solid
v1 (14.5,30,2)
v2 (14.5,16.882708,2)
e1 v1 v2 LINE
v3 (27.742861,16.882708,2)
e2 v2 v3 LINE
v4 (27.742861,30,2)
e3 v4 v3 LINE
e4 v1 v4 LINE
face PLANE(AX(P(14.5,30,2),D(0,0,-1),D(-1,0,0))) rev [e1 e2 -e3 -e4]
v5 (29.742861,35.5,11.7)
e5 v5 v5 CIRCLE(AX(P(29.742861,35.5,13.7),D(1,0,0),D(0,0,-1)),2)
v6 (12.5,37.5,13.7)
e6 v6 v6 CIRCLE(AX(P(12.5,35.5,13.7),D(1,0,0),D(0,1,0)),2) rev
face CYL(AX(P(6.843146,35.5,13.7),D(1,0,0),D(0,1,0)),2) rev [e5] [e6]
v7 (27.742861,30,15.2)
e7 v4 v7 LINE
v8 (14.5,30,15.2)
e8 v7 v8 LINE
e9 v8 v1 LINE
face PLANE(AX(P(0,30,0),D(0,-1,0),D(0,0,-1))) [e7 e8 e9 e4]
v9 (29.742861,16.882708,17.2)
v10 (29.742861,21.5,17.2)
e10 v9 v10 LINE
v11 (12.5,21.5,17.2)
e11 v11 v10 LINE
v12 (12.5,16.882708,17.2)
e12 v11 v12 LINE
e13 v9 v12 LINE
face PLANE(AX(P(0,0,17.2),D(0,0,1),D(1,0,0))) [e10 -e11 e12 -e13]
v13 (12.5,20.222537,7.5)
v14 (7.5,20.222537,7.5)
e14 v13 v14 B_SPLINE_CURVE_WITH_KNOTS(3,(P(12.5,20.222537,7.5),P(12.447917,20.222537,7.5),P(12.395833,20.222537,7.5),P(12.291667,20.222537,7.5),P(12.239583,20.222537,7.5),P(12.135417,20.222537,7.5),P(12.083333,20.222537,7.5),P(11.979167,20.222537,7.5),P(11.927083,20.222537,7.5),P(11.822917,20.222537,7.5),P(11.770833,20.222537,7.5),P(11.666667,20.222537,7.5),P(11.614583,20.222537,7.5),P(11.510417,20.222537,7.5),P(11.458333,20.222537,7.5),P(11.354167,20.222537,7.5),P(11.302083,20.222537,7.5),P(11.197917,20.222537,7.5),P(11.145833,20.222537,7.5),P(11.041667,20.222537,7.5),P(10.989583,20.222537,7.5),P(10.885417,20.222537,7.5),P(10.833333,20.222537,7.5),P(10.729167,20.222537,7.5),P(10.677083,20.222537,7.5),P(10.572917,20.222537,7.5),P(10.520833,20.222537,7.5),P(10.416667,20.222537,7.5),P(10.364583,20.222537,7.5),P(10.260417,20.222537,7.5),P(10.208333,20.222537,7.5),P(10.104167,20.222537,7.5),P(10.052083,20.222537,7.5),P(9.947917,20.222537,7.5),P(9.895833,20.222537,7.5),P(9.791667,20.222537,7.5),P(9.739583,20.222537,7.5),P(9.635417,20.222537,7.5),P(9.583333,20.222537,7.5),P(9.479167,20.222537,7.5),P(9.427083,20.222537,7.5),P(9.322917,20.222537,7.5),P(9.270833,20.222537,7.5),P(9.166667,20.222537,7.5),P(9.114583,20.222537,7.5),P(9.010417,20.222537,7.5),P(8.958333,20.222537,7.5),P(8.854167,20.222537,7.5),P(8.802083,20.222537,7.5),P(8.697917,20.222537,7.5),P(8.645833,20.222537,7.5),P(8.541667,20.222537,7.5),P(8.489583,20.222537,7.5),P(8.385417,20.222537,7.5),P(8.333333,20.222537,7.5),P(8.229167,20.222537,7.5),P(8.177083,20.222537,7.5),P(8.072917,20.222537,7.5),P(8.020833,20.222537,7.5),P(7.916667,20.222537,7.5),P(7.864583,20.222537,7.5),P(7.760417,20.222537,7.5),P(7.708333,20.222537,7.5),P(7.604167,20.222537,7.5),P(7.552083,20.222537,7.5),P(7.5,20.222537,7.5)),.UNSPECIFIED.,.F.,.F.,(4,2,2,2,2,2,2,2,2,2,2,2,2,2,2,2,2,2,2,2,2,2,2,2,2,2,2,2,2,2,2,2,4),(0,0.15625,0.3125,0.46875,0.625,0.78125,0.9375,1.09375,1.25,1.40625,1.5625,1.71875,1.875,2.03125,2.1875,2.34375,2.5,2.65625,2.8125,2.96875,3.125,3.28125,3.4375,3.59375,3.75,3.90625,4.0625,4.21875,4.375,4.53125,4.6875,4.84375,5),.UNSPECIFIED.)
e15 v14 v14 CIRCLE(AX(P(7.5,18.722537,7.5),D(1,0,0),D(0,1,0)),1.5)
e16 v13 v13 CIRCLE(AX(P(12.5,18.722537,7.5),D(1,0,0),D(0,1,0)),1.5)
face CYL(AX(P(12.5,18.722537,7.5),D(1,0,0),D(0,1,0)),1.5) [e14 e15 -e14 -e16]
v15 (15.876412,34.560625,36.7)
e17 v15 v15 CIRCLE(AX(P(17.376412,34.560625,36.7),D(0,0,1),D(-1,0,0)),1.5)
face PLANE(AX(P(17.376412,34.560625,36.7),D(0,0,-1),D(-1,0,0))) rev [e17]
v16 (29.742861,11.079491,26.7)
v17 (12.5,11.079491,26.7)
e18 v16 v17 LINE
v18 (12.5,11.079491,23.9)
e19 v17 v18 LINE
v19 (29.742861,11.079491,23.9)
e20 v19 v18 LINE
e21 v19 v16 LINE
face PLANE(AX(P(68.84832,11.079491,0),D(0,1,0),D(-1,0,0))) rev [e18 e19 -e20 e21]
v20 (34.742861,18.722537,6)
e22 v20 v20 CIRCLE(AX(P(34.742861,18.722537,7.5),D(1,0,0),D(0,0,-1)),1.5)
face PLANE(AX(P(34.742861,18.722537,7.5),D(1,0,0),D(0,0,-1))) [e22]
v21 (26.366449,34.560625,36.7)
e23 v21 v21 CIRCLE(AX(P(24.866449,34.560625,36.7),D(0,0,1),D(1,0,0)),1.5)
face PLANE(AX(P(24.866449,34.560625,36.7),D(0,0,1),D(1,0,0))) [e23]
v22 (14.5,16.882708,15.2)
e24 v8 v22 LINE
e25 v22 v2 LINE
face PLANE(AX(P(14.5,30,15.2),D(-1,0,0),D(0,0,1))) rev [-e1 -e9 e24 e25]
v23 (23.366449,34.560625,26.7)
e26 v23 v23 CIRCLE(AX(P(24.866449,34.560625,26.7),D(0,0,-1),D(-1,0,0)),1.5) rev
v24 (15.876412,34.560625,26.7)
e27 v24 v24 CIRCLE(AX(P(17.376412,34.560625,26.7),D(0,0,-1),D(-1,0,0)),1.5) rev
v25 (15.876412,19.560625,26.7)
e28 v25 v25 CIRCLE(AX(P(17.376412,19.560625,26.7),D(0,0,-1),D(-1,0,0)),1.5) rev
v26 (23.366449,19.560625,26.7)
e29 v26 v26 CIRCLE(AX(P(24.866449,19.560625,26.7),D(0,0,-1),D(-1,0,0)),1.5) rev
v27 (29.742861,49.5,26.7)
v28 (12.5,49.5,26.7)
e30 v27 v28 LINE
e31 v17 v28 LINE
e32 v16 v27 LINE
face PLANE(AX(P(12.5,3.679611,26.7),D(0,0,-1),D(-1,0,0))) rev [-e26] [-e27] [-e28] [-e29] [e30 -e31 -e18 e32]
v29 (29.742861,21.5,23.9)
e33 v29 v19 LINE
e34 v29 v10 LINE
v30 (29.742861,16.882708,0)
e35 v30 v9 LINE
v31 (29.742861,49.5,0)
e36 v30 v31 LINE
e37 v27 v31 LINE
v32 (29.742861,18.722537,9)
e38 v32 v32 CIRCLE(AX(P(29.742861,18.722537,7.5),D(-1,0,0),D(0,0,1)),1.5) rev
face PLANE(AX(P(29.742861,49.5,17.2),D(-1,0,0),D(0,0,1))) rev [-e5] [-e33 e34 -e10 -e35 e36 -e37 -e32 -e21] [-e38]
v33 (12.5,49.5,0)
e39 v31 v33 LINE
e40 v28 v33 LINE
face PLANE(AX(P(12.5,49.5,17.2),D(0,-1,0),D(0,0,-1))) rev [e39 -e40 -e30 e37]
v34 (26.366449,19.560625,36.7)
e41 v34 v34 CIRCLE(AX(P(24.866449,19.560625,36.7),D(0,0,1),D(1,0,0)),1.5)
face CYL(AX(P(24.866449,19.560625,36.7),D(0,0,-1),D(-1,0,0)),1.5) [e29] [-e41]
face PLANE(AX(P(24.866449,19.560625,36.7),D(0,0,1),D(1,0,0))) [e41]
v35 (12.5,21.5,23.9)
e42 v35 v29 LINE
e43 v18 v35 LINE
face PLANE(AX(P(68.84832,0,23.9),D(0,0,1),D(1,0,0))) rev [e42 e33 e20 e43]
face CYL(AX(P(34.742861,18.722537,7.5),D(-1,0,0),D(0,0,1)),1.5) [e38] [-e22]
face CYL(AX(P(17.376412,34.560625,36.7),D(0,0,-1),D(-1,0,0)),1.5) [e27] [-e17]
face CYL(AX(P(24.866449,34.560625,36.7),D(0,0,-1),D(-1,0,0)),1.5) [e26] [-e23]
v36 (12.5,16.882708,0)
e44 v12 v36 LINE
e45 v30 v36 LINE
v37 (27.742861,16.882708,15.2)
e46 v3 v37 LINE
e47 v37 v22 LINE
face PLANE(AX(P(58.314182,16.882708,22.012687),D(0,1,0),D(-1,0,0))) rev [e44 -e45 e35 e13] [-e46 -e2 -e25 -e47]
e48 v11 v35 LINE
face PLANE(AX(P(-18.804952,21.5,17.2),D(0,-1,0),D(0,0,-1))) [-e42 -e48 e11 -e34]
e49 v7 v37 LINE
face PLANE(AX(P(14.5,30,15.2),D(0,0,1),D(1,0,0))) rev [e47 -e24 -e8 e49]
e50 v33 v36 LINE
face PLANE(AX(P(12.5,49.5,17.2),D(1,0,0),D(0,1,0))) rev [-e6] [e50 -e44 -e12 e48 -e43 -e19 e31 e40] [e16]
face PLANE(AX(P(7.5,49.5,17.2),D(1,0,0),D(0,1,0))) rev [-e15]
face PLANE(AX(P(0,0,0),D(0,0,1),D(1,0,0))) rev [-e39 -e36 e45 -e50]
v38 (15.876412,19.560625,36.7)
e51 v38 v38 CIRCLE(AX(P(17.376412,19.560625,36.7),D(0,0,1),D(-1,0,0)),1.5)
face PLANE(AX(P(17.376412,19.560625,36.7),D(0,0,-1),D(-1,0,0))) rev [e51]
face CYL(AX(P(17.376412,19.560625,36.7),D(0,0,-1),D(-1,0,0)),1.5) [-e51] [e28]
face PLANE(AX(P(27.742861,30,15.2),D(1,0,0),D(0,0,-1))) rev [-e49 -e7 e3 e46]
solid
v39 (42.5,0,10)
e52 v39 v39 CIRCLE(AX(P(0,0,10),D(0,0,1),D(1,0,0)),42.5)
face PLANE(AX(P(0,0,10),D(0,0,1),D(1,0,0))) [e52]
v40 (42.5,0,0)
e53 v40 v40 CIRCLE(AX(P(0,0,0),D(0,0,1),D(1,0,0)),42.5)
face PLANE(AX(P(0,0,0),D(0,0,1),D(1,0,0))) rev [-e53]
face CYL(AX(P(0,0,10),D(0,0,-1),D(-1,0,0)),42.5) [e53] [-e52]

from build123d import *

# Parameters (mm, degrees)
SKETCH4_R               = 42.5
BASE_DEPTH              = 10
SKETCH5_W               = 17.242861366
SKETCH5_H               = 43.5
BOSS_EXTRUDE1_DEPTH     = 17.2
SKETCH6_W               = 13.242861366
SKETCH6_H               = 13.2
CUT_EXTRUDE1_DEPTH      = 24
SKETCH9_R               = 1.5
BOSS_EXTRUDE2_DEPTH     = 5
WRAP1_START             = -22.242861366
WRAP1_OUTLINE_R         = 1.5
WRAP1_DEPTH             = 5
SKETCH14_W              = 14
SKETCH14_H              = 28
BOSS_EXTRUDE4_DEPTH     = 17.242861366
SKETCH16_R              = 14
CUT_EXTRUDE2_DEPTH      = 17.242861366
CUT_EXTRUDE4_REACH      = 108.036
SKETCH19_W              = 17.242861366
SKETCH19_H              = 4.5
CUT_EXTRUDE6_REACH      = 71.795
CUT_EXTRUDE6_END_RADIUS = 14
SKETCH22_W              = 17.242861366
SKETCH22_H              = 2.8
SKETCH23_R              = 2
CUT_EXTRUDE7_DEPTH      = 17.242861366
CUT_EXTRUDE8_REACH      = 80.665
SKETCH24_W              = 17.2
SKETCH24_H              = 5.3
CUT_EXTRUDE9_REACH      = 80.665
SKETCH25_W              = 27.034559723
SKETCH25_H              = 9.24407526
SKETCH26_W              = 2.8
SKETCH26_H              = 10.42050917
BOSS_EXTRUDE5_DEPTH     = 17.242861366
SKETCH27_R              = 1.5
BOSS_EXTRUDE6_DEPTH     = 10


# Read off the part's stored shape, not the designer's step: Wrap1
with BuildPart() as part:
    # Sketch4 → base (new body)
    with BuildSketch(Plane.XY):
        Circle(SKETCH4_R)
    extrude(amount=BASE_DEPTH)


with BuildPart() as body_2:
    # Sketch5 → Boss-Extrude1 (new body)
    with BuildSketch(Plane.XY):
        with Locations((21.121430683, 27.75)):
            Rectangle(SKETCH5_W, SKETCH5_H)
    extrude(amount=BOSS_EXTRUDE1_DEPTH)

    # Sketch6 → Cut-Extrude1 (cut)
    with BuildSketch(Plane(origin=(0, 6, 0), x_dir=(-1, 0, 0), z_dir=(0, -1, 0))):
        with Locations((-21.121430683, -8.6)):
            Rectangle(SKETCH6_W, SKETCH6_H)
    extrude(amount=-CUT_EXTRUDE1_DEPTH, mode=Mode.SUBTRACT)

    # Sketch9 → Boss-Extrude2 (add)
    with BuildSketch(Plane(origin=(29.742861366, 0, 0), x_dir=(0, 0, -1), z_dir=(1, 0, 0))):
        with Locations(Location((-7.5, 18.722537456, 0), (0, 0, 180))):
            Circle(SKETCH9_R)
    extrude(amount=BOSS_EXTRUDE2_DEPTH)

    # Wrap1 outline → Wrap1 (add)
    with BuildSketch(Plane(origin=(29.742861366, 0, 0), x_dir=(0, 0, -1), z_dir=(1, 0, 0)).offset(WRAP1_START)):
        with Locations((-7.5, 18.722537456)):
            Circle(WRAP1_OUTLINE_R)
    extrude(amount=WRAP1_DEPTH)

    # Sketch14 → Boss-Extrude4 (add)
    with BuildSketch(Plane(origin=(29.742861366, 0, 0), x_dir=(0, 0, -1), z_dir=(1, 0, 0))):
        with Locations((-24.2, 35.5)):
            Rectangle(SKETCH14_W, SKETCH14_H)
    extrude(amount=-BOSS_EXTRUDE4_DEPTH)

    # Sketch16 → Cut-Extrude2 (cut)
    with BuildSketch(Plane(origin=(29.742861366, 0, 0), x_dir=(0, 0, -1), z_dir=(1, 0, 0))):
        with Locations((-31.2, 35.5)):
            Circle(SKETCH16_R)
    extrude(amount=-CUT_EXTRUDE2_DEPTH, mode=Mode.SUBTRACT)

    # Cut-Extrude4: up to this face of the body (flat: up to its plane)
    cut_extrude4_end = Plane(body_2.part.faces().sort_by_distance((21.121430683, 21.5, 24.2))[0])
    # Sketch19 → Cut-Extrude4 (cut, up to the picked face)
    with BuildSketch(Plane(origin=(0, 49.5, 0), x_dir=(1, 0, 0), z_dir=(0, 1, 0)), mode=Mode.PRIVATE) as cut_extrude4_sk1:
        with Locations((21.121430683, -28.95)):
            Rectangle(SKETCH19_W, SKETCH19_H)
    cut_extrude4_tool1 = split(extrude(cut_extrude4_sk1.sketch, amount=-CUT_EXTRUDE4_REACH, mode=Mode.PRIVATE), bisect_by=cut_extrude4_end, keep=Keep.BOTH, mode=Mode.PRIVATE)
    add(cut_extrude4_tool1.solids().sort_by(Axis((21.121431, 49.5, 28.95), (0, -1, 0)))[0], mode=Mode.SUBTRACT)

    # Cut-Extrude6: up to this cylinder (the profile starts outside it)
    cut_extrude6_end = Plane(origin=(21.121431, 35.5, 31.2), z_dir=(1, 0, 0)) * Cylinder(CUT_EXTRUDE6_END_RADIUS, 172.59, mode=Mode.PRIVATE)
    # Sketch22 → Cut-Extrude6 (cut, up to the surface)
    with BuildSketch(Plane(origin=(0, 6, 0), x_dir=(-1, 0, 0), z_dir=(0, -1, 0)), mode=Mode.PRIVATE) as cut_extrude6_sk1:
        with Locations((-21.121430683, -25.3)):
            Rectangle(SKETCH22_W, SKETCH22_H)
    cut_extrude6_tool1 = extrude(cut_extrude6_sk1.sketch, amount=-CUT_EXTRUDE6_REACH, mode=Mode.PRIVATE) - cut_extrude6_end
    add(cut_extrude6_tool1.solids().sort_by_distance((21.121431, 6, 25.3))[0], mode=Mode.SUBTRACT)

    # Sketch23 → Cut-Extrude7 (cut)
    with BuildSketch(Plane(origin=(29.742861366, 0, 0), x_dir=(0, 0, -1), z_dir=(1, 0, 0))):
        with Locations(Location((-13.7, 35.5, 0), (0, 0, 90))):
            Circle(SKETCH23_R)
    extrude(amount=-CUT_EXTRUDE7_DEPTH, mode=Mode.SUBTRACT)

    # Cut-Extrude8: up to this face of the body (flat: up to its plane)
    cut_extrude8_end = Plane(body_2.part.faces().sort_by_distance((29.742861366, 28.520960227, 9.624194882))[0])
    # Sketch24 → Cut-Extrude8 (cut, up to the picked face)
    with BuildSketch(Plane.ZY.offset(-12.5), mode=Mode.PRIVATE) as cut_extrude8_sk1:
        with Locations((8.6, 8.65)):
            Rectangle(SKETCH24_W, SKETCH24_H)
    cut_extrude8_tool1 = split(extrude(cut_extrude8_sk1.sketch, amount=-CUT_EXTRUDE8_REACH, mode=Mode.PRIVATE), bisect_by=cut_extrude8_end, keep=Keep.BOTH, mode=Mode.PRIVATE)
    add(cut_extrude8_tool1.solids().sort_by(Axis((12.5, 8.65, 8.6), (1, 0, 0)))[0], mode=Mode.SUBTRACT)

    # Cut-Extrude9: up to this face of the body (flat: up to its plane)
    cut_extrude9_end = Plane(body_2.part.faces().sort_by_distance((29.742861366, 31.052365507, 9.754669319))[0])
    # Sketch25 → Cut-Extrude9 (cut, up to the picked face)
    with BuildSketch(Plane.ZY.offset(-12.5), mode=Mode.PRIVATE) as cut_extrude9_sk1:
        with Locations((8.495407017, 12.260670009)):
            Rectangle(SKETCH25_W, SKETCH25_H)
    cut_extrude9_tool1 = split(extrude(cut_extrude9_sk1.sketch, amount=-CUT_EXTRUDE9_REACH, mode=Mode.PRIVATE), bisect_by=cut_extrude9_end, keep=Keep.BOTH, mode=Mode.PRIVATE)
    add(cut_extrude9_tool1.solids().sort_by(Axis((12.5, 12.26067, 8.495407), (1, 0, 0)))[0], mode=Mode.SUBTRACT)

    # Sketch26 → Boss-Extrude5 (add)
    with BuildSketch(Plane.ZY.offset(-12.5)):
        Polygon((16.229247073, 48.406672833), (17.2, 21.5), (23.9, 21.5), (26.7, 21.5), (26.7, 48.757073584), align=None)
        with Locations((25.3, 16.289745415)):
            Rectangle(SKETCH26_W, SKETCH26_H)
    extrude(amount=-BOSS_EXTRUDE5_DEPTH)

    # Sketch27 → Boss-Extrude6 (add)
    with BuildSketch(Plane.XY.offset(26.7)):
        with Locations(Location((24.866448866, 19.560624718, 0), (0, 0, 180))):
            Circle(SKETCH27_R)
        with Locations(Location((17.3764125, 19.560624718, 0), (0, 0, 180))):
            Circle(SKETCH27_R)
        with Locations(Location((24.866448866, 34.560624718, 0), (0, 0, 180))):
            Circle(SKETCH27_R)
        with Locations(Location((17.3764125, 34.560624718, 0), (0, 0, 180))):
            Circle(SKETCH27_R)
    extrude(amount=BOSS_EXTRUDE6_DEPTH)


solid = Compound([part.part, body_2.part])
